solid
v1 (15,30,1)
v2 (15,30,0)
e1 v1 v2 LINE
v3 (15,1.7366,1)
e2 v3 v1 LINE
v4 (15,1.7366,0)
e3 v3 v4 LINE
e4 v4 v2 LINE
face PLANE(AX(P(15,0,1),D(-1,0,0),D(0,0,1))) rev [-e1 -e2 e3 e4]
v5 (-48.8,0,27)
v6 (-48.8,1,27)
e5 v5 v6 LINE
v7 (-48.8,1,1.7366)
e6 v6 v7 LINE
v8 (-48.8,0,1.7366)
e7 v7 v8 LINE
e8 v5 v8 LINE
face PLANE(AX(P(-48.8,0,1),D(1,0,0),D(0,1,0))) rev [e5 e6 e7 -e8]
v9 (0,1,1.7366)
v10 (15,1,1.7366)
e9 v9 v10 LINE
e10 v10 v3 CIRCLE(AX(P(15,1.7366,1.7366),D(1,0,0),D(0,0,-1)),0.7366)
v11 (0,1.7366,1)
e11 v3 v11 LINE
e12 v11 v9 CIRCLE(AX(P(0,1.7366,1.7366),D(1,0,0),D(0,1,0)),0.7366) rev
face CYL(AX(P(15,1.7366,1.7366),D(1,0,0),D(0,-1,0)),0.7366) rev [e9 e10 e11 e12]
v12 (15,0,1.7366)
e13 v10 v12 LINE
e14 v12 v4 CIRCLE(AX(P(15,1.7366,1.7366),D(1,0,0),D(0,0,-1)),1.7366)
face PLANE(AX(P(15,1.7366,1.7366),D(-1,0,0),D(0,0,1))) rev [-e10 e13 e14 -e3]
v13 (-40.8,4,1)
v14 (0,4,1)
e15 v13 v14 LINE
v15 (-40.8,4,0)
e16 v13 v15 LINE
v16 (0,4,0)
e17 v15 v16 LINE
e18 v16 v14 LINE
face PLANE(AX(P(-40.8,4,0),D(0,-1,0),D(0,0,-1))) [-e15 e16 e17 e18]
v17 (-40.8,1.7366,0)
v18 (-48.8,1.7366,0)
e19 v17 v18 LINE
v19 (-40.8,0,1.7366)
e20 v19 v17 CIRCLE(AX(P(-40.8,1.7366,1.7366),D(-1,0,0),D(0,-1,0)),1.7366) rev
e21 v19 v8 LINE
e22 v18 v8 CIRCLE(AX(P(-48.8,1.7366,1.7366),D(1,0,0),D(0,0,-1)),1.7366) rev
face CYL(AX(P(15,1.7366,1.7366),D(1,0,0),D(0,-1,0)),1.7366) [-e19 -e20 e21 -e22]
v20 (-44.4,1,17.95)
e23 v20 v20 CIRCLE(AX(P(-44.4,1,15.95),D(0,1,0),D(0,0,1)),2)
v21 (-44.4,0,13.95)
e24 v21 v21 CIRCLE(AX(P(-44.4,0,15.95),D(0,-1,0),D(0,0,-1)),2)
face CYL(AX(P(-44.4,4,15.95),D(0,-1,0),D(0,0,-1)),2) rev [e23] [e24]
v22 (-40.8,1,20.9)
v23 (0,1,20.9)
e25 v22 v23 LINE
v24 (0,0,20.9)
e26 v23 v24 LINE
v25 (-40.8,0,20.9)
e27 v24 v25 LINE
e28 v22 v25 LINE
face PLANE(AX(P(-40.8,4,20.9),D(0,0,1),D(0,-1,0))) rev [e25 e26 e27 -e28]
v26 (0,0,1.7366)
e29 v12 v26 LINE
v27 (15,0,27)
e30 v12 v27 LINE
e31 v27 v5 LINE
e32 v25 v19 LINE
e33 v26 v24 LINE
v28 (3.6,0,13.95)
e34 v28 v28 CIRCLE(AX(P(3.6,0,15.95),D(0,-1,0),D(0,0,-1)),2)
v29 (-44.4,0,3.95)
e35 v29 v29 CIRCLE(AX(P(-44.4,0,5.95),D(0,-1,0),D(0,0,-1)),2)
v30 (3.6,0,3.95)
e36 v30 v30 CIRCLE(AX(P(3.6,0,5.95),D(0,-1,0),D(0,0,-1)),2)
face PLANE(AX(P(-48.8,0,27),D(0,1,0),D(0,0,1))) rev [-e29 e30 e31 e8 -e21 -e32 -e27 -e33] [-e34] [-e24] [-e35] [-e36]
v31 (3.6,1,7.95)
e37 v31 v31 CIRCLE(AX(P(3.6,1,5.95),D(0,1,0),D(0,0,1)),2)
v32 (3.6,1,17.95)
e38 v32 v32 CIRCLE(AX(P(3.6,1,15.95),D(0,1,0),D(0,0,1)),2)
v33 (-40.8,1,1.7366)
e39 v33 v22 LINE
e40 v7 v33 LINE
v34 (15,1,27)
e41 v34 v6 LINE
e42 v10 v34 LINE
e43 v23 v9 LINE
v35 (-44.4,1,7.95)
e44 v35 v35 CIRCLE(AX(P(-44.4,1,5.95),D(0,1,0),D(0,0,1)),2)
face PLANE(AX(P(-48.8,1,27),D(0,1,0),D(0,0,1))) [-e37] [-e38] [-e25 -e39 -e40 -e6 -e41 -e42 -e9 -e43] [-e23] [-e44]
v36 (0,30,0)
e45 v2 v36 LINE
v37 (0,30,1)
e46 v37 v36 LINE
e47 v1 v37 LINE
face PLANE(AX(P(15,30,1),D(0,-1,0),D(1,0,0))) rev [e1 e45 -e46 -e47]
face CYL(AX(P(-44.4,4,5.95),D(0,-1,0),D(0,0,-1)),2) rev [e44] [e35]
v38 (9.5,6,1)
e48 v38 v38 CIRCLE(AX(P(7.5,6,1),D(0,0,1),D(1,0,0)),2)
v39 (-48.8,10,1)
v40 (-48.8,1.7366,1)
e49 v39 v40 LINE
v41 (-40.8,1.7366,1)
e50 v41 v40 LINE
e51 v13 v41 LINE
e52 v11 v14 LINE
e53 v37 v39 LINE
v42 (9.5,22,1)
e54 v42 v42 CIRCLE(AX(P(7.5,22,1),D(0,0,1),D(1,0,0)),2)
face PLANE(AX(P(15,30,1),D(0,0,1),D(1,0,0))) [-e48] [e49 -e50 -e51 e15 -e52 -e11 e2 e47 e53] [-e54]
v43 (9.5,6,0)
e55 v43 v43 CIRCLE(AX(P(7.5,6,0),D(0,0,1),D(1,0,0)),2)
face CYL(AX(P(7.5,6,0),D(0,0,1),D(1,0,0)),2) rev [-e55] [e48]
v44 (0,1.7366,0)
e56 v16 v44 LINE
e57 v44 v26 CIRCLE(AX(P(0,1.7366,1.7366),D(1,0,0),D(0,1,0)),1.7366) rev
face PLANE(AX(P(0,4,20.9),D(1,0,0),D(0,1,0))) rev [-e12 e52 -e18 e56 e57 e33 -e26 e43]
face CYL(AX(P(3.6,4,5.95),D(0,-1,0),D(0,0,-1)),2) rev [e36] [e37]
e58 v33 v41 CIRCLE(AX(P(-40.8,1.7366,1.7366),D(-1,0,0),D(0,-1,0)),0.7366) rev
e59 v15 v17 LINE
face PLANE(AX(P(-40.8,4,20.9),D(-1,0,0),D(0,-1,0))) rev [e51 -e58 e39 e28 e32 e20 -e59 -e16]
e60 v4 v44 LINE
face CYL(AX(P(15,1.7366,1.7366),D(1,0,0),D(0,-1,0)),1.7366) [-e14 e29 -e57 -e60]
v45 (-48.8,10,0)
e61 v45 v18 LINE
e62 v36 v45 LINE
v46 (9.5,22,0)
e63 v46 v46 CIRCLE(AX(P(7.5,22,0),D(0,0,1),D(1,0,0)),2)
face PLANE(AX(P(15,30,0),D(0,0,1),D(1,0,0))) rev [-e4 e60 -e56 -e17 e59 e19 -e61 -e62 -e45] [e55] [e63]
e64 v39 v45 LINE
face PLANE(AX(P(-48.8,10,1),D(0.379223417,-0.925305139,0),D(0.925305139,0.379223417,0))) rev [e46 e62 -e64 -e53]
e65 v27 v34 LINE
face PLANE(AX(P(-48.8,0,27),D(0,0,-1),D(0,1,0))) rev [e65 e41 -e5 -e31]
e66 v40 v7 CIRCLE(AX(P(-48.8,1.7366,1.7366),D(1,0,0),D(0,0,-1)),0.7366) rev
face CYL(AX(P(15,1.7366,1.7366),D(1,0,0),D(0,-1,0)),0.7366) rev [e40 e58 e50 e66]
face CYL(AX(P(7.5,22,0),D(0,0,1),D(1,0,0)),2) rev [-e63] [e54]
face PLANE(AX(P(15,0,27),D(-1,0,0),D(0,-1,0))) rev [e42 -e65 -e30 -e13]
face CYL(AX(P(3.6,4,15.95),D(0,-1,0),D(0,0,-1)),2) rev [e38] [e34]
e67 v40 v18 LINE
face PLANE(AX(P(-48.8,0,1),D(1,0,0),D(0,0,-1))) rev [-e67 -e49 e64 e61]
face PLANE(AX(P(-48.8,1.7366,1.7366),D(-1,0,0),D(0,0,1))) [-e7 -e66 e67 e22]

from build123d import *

# Parameters (mm, degrees)
T_LE_DE_BASE_PLI_E1_DEPTH             = 1
T_LE_PLI_E_SUR_AR_TE1_STRIP_W         = 5.4732
T_LE_PLI_E_SUR_AR_TE1_STRIP_H         = 1
T_LE_PLI_E_SUR_AR_TE1_STRIP_CUT_DEPTH = 63.8
T_LE_PLI_E_SUR_AR_TE1_DEPTH           = 63.8
ESQUISSE6_R                           = 2
ESQUISSE6_W                           = 40.8
ESQUISSE6_H                           = 20.9
ENL_V_MAT_EXTRU_1_DEPTH               = 4
ESQUISSE7_R                           = 2
ENL_V_MAT_EXTRU_2_DEPTH               = 63.908187067


# Sheet-metal steps are written as plain solids
with BuildPart() as part:
    # Esquisse1 → Tôle de base pliée1 (new body)
    with BuildSketch(Plane.XY):
        Polygon((-48.8, 10), (0, 30), (15, 30), (15, 0), (-48.8, 0), align=None)
    extrude(amount=T_LE_DE_BASE_PLI_E1_DEPTH)

    # Tôle pliée sur arête1 strip (across the edge) → Tôle pliée sur arête1 strip cut (cut)
    with BuildSketch(Plane(origin=(-48.8, 0, 1), x_dir=(0, 1, 0), z_dir=(1, 0, 0))):
        with Locations((-1, -0.5)):
            Rectangle(T_LE_PLI_E_SUR_AR_TE1_STRIP_W, T_LE_PLI_E_SUR_AR_TE1_STRIP_H)
    extrude(amount=T_LE_PLI_E_SUR_AR_TE1_STRIP_CUT_DEPTH, mode=Mode.SUBTRACT)

    # Tôle pliée sur arête1 section (across the edge) → Tôle pliée sur arête1 (add)
    with BuildSketch(Plane(origin=(-48.8, 0, 1), x_dir=(0, 1, 0), z_dir=(1, 0, 0))):
        with BuildLine():
            Line((0, 0.7366), (0, 26))
            Line((0, 26), (1, 26))
            Line((1, 26), (1, 0.7366))
            ThreePointArc((1, 0.7366), (1.215745145, 0.215745145), (1.7366, 0))
            Line((1.7366, 0), (1.7366, -1))
            ThreePointArc((1.7366, -1), (0.508638364, -0.491361636), (0, 0.7366))
        make_face()
    extrude(amount=T_LE_PLI_E_SUR_AR_TE1_DEPTH)

    # Esquisse6 → Enlèv. mat.-Extru.1 (cut)
    with BuildSketch(Plane.XZ):
        with Locations(Location((3.6, 15.95, 0), (0, 0, 270))):
            Circle(ESQUISSE6_R)
        with Locations(Location((3.6, 5.95, 0), (0, 0, 270))):
            Circle(ESQUISSE6_R)
        with Locations(Location((-44.4, 15.95, 0), (0, 0, 270))):
            Circle(ESQUISSE6_R)
        with Locations(Location((-44.4, 5.95, 0), (0, 0, 270))):
            Circle(ESQUISSE6_R)
        with Locations((-20.4, 10.45)):
            Rectangle(ESQUISSE6_W, ESQUISSE6_H)
    extrude(amount=-ENL_V_MAT_EXTRU_1_DEPTH, mode=Mode.SUBTRACT)

    # Esquisse7 → Enlèv. mat.-Extru.2 (cut, through all)
    with BuildSketch(Plane.XY.offset(1)):
        with Locations((7.5, 22)):
            Circle(ESQUISSE7_R)
        with Locations((7.5, 6)):
            Circle(ESQUISSE7_R)
    extrude(amount=-ENL_V_MAT_EXTRU_2_DEPTH, mode=Mode.SUBTRACT)


solid = part.part
